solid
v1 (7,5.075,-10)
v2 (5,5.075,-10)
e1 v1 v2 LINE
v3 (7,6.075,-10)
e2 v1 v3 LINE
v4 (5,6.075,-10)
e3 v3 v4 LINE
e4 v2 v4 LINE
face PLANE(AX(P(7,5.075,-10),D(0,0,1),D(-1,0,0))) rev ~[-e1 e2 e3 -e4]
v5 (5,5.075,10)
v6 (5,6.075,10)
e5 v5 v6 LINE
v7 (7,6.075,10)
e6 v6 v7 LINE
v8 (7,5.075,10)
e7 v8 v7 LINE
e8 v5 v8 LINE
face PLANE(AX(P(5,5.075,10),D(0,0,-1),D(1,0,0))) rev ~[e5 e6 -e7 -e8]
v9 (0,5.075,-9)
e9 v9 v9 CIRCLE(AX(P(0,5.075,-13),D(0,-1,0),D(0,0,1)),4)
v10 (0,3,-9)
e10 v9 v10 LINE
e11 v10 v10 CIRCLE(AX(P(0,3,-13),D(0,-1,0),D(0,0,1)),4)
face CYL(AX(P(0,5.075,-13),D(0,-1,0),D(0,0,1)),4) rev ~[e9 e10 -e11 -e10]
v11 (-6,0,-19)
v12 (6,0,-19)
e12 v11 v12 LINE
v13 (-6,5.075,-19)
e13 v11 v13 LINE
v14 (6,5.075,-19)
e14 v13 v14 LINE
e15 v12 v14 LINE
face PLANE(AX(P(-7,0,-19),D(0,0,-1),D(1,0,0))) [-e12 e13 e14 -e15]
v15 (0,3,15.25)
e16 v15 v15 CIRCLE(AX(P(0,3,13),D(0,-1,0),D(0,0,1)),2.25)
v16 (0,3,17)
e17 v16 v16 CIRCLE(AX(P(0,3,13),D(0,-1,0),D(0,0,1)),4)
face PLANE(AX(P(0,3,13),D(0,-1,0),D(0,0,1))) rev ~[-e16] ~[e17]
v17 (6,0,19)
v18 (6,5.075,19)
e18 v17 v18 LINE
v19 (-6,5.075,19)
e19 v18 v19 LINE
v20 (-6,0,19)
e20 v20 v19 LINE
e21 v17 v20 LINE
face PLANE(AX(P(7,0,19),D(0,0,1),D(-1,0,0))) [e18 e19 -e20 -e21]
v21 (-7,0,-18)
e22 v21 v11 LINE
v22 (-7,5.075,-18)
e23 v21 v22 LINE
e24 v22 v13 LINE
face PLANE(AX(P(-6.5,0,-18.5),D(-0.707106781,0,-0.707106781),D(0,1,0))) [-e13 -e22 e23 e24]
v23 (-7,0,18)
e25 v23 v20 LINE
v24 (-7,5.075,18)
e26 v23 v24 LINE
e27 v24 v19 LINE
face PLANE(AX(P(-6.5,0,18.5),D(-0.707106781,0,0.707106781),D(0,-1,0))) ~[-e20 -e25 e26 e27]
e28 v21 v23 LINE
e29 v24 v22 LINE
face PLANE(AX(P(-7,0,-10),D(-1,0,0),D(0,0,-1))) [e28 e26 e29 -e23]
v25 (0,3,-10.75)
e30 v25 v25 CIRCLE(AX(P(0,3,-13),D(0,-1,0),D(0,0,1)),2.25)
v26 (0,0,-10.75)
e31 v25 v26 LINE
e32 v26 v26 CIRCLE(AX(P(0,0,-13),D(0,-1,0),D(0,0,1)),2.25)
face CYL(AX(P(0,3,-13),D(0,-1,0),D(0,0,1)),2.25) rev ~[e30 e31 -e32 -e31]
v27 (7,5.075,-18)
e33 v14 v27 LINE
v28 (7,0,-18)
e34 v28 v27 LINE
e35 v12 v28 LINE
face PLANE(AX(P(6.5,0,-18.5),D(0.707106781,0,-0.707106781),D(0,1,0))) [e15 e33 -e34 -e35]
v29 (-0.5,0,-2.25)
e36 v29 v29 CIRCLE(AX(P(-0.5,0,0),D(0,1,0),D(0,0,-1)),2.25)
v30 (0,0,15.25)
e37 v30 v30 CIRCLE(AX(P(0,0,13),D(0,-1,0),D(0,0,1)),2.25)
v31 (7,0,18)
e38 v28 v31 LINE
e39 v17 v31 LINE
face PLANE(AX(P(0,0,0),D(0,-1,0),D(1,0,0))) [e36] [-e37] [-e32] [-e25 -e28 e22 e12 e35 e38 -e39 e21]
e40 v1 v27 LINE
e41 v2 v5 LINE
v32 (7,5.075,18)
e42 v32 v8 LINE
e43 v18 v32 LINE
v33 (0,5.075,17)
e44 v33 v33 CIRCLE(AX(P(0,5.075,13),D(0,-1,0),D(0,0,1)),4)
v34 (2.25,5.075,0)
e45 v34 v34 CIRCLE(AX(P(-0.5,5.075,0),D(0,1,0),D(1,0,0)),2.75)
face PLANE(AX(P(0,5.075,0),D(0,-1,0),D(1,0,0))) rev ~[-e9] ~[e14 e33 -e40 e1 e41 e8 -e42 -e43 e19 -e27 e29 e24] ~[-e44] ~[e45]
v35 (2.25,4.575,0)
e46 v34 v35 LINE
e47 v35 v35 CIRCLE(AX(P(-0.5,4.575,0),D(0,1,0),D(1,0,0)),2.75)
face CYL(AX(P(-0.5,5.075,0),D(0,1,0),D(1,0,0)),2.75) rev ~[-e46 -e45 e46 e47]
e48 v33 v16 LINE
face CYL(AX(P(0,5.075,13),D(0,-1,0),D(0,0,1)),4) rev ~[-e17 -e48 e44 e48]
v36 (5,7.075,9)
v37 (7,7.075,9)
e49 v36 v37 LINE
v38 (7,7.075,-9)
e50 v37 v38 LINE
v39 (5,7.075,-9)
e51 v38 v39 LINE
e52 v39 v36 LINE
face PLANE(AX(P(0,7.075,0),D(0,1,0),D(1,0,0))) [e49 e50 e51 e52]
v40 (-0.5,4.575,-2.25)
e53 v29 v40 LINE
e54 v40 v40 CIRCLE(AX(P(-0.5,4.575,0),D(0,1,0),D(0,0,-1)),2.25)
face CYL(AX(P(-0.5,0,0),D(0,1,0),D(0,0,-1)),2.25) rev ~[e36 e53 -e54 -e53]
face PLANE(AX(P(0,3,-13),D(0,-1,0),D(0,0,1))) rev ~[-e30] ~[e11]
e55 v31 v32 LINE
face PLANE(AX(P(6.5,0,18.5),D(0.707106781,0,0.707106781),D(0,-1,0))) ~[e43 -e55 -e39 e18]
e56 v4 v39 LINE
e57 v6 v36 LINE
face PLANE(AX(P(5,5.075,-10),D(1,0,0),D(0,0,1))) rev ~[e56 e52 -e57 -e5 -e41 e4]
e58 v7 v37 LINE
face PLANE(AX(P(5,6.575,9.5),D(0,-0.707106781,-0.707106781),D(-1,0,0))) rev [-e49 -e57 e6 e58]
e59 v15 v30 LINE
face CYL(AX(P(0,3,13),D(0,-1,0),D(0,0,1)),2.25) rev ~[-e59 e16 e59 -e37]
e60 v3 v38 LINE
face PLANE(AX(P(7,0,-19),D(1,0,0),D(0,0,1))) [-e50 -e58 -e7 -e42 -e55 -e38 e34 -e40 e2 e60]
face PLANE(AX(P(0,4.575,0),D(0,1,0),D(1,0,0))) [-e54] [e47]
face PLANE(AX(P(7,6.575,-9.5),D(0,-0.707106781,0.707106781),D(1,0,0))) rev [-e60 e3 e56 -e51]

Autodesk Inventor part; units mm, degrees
ref_plane "YZ Plane" through (0, 0, 0) normal (1, 0, 0) x (0, 1, 0)
ref_plane "XZ Plane" through (0, 0, 0) normal (0, 1, 0) x (-1, 0, 0)
ref_plane "XY Plane" through (0, 0, 0) normal (0, 0, 1) x (1, 0, 0)
sketch "Sketch1" plane through (0, 0, 0) normal (0, 1, 0) x (-1, 0, 0)
  line L0 (7, 10) -> (-7, 10)
  line L1 (-7, 10) -> (-7, -10)
  line L2 (-7, -10) -> (7, -10)
  line L3 (7, -10) -> (7, 10)
  line L4 (7, 10) -> (-7, -10) construction
  line L5 (-7, 10) -> (7, -10) construction
  point P0 (0, 0)
  dimension "POST_WIDTH" = 20
  dimension "POST_LENGTH" = 14
extrude "Extrusion1" add sketch "Sketch1" along normal blind 5.075
sketch "Sketch2" plane through (0, 0, 0) normal (0, -1, 0) x (1, 0, 0)
  line L0 (-7, -19) -> (7, -19)
  line L1 (7, -19) -> (7, 19)
  line L2 (7, 19) -> (-7, 19)
  line L3 (-7, 19) -> (-7, -19)
  line L4 (-7, -19) -> (7, 19) construction
  line L5 (7, -19) -> (-7, 19) construction
  line L6 (-7, -10) -> (-7, 10) projected
  line L7 (-7, 10) -> (7, 10) projected
  point P0 (0, 0)
  dimension "d4" = 0
  dimension "WING_LENGTH" = 9
extrude "Extrusion2" add sketch "Sketch2" against normal blind 5.075
sketch "Sketch3" plane through (0, 5.075, 0) normal (0, 1, 0) x (1, 0, 0)
  line L0 (-7, 19) -> (7, 19) projected
  line L1 (0, 19) -> (0, -19)
  line L2 (7, -19) -> (-7, -19) projected
  line L3 (7, 0) -> (-7, 0)
  line L4 (-7, -19) -> (-7, 19) projected
  point P0 (0, 0)
  point P1 (0, -13)
  point P2 (0, 13)
  dimension "d15" = 0
  dimension "d16" = 6
hole "Hole1" at (0, 5.075, 13) at (0, 5.075, -13) direction (0, -1, 0) diameter 4.5 end through all counterbore diameter 8 counterbore depth 2.075 clearance for "Socket Head Cap Screw" size "#8" standard "Ansi Unified Screw Threads"
chamfer "Chamfer4" distance 1 angle 45 4 edges at (-7, 2.5375, 19) (7, 2.5375, 19) (-7, 2.5375, -19) (7, 2.5375, -19)
sketch "Sketch4" plane through (0, 5.075, 0) normal (0, 1, 0) x (1, 0, 0)
  line L0 (7, 10) -> (5, 10)
  line L1 (5, 10) -> (5, -10)
  line L2 (5, -10) -> (7, -10)
  line L3 (7, -10) -> (7, 10)
  line L4 (7, -18) -> (7, 18) projected
  point P0 (0, 0)
  dimension "d56" = 20
  dimension "d57" = 2
  dimension "d58" = 0
  dimension "d59" = 10
extrude "Extrusion3" add sketch "Sketch4" along normal blind 2
sketch "Sketch5" plane through (0, 0, 0) normal (0, -1, 0) x (1, 0, 0)
  line L0 (-9.8, 0) -> (9.8, 0) projected
  line L1 (0, 26.6) -> (0, -26.6) projected
  line L2 (-7, 19) -> (-7, -19) projected
  line L3 (7, -10) -> (7, -18) projected
  line L4 (6, -19) -> (7, -18) projected
  line L5 (6, -19) -> (-6, -19) projected
  line L6 (-7, -18) -> (-6, -19) projected
  line L7 (-7, -18) -> (-7, 18) projected
  line L8 (-6, 19) -> (-7, 18) projected
  line L9 (-6, 19) -> (6, 19) projected
  line L10 (7, 18) -> (6, 19) projected
  line L11 (5, -10) -> (7, -10) projected
  line L12 (7, 18) -> (7, 10) projected
  line L13 (7, 10) -> (5, 10) projected
  line L14 (5, 10) -> (5, -10) projected
  point P0 (-0.5, 0)
hole "Hole2" at (-0.5, 0, 0) direction (0, 1, 0) diameter 4.5 end through all clearance for "Socket Head Cap Screw" size "#8" standard "Ansi Unified Screw Threads"
chamfer "Chamfer1" distance 1 angle 45 2 edges at (6, 7.075, -10) (6, 7.075, 10)
chamfer "Chamfer2" [suppressed]
sketch "Sketch7" plane through (0, 5.075, 0) normal (0, 1, 0) x (1, 0, 0)
  circle A0 centre (-0.5, 0) radius 2.75
  circle A1 centre (-0.5, 0) radius 2.25 projected
  point P0 (0, 0)
  dimension "d46" = 5.5
extrude "Extrusion5" cut sketch "Sketch7" against normal blind 0.5 contours A0 | A1
equation "\"POST_LENGTH\" = 2 * LIP_THICKNESS + BASE_THICKNESS"
equation "\"POST_HEIGHT\" = BEAM_HEIGHT - BASE2APERTURE_CENTER"
equation "\"BASE2APERTURE_CENTER\" = 13.975"
equation "\"BEAM_HEIGHT\" = 19.05"
equation "\"WALL_GAP\" = 0.5"
equation "\"LIP_THICKNESS\" = 2"
equation "\"BASE_THICKNESS\" = 10"
properties part number "ADAPTER_RSP05-BH19.05"
